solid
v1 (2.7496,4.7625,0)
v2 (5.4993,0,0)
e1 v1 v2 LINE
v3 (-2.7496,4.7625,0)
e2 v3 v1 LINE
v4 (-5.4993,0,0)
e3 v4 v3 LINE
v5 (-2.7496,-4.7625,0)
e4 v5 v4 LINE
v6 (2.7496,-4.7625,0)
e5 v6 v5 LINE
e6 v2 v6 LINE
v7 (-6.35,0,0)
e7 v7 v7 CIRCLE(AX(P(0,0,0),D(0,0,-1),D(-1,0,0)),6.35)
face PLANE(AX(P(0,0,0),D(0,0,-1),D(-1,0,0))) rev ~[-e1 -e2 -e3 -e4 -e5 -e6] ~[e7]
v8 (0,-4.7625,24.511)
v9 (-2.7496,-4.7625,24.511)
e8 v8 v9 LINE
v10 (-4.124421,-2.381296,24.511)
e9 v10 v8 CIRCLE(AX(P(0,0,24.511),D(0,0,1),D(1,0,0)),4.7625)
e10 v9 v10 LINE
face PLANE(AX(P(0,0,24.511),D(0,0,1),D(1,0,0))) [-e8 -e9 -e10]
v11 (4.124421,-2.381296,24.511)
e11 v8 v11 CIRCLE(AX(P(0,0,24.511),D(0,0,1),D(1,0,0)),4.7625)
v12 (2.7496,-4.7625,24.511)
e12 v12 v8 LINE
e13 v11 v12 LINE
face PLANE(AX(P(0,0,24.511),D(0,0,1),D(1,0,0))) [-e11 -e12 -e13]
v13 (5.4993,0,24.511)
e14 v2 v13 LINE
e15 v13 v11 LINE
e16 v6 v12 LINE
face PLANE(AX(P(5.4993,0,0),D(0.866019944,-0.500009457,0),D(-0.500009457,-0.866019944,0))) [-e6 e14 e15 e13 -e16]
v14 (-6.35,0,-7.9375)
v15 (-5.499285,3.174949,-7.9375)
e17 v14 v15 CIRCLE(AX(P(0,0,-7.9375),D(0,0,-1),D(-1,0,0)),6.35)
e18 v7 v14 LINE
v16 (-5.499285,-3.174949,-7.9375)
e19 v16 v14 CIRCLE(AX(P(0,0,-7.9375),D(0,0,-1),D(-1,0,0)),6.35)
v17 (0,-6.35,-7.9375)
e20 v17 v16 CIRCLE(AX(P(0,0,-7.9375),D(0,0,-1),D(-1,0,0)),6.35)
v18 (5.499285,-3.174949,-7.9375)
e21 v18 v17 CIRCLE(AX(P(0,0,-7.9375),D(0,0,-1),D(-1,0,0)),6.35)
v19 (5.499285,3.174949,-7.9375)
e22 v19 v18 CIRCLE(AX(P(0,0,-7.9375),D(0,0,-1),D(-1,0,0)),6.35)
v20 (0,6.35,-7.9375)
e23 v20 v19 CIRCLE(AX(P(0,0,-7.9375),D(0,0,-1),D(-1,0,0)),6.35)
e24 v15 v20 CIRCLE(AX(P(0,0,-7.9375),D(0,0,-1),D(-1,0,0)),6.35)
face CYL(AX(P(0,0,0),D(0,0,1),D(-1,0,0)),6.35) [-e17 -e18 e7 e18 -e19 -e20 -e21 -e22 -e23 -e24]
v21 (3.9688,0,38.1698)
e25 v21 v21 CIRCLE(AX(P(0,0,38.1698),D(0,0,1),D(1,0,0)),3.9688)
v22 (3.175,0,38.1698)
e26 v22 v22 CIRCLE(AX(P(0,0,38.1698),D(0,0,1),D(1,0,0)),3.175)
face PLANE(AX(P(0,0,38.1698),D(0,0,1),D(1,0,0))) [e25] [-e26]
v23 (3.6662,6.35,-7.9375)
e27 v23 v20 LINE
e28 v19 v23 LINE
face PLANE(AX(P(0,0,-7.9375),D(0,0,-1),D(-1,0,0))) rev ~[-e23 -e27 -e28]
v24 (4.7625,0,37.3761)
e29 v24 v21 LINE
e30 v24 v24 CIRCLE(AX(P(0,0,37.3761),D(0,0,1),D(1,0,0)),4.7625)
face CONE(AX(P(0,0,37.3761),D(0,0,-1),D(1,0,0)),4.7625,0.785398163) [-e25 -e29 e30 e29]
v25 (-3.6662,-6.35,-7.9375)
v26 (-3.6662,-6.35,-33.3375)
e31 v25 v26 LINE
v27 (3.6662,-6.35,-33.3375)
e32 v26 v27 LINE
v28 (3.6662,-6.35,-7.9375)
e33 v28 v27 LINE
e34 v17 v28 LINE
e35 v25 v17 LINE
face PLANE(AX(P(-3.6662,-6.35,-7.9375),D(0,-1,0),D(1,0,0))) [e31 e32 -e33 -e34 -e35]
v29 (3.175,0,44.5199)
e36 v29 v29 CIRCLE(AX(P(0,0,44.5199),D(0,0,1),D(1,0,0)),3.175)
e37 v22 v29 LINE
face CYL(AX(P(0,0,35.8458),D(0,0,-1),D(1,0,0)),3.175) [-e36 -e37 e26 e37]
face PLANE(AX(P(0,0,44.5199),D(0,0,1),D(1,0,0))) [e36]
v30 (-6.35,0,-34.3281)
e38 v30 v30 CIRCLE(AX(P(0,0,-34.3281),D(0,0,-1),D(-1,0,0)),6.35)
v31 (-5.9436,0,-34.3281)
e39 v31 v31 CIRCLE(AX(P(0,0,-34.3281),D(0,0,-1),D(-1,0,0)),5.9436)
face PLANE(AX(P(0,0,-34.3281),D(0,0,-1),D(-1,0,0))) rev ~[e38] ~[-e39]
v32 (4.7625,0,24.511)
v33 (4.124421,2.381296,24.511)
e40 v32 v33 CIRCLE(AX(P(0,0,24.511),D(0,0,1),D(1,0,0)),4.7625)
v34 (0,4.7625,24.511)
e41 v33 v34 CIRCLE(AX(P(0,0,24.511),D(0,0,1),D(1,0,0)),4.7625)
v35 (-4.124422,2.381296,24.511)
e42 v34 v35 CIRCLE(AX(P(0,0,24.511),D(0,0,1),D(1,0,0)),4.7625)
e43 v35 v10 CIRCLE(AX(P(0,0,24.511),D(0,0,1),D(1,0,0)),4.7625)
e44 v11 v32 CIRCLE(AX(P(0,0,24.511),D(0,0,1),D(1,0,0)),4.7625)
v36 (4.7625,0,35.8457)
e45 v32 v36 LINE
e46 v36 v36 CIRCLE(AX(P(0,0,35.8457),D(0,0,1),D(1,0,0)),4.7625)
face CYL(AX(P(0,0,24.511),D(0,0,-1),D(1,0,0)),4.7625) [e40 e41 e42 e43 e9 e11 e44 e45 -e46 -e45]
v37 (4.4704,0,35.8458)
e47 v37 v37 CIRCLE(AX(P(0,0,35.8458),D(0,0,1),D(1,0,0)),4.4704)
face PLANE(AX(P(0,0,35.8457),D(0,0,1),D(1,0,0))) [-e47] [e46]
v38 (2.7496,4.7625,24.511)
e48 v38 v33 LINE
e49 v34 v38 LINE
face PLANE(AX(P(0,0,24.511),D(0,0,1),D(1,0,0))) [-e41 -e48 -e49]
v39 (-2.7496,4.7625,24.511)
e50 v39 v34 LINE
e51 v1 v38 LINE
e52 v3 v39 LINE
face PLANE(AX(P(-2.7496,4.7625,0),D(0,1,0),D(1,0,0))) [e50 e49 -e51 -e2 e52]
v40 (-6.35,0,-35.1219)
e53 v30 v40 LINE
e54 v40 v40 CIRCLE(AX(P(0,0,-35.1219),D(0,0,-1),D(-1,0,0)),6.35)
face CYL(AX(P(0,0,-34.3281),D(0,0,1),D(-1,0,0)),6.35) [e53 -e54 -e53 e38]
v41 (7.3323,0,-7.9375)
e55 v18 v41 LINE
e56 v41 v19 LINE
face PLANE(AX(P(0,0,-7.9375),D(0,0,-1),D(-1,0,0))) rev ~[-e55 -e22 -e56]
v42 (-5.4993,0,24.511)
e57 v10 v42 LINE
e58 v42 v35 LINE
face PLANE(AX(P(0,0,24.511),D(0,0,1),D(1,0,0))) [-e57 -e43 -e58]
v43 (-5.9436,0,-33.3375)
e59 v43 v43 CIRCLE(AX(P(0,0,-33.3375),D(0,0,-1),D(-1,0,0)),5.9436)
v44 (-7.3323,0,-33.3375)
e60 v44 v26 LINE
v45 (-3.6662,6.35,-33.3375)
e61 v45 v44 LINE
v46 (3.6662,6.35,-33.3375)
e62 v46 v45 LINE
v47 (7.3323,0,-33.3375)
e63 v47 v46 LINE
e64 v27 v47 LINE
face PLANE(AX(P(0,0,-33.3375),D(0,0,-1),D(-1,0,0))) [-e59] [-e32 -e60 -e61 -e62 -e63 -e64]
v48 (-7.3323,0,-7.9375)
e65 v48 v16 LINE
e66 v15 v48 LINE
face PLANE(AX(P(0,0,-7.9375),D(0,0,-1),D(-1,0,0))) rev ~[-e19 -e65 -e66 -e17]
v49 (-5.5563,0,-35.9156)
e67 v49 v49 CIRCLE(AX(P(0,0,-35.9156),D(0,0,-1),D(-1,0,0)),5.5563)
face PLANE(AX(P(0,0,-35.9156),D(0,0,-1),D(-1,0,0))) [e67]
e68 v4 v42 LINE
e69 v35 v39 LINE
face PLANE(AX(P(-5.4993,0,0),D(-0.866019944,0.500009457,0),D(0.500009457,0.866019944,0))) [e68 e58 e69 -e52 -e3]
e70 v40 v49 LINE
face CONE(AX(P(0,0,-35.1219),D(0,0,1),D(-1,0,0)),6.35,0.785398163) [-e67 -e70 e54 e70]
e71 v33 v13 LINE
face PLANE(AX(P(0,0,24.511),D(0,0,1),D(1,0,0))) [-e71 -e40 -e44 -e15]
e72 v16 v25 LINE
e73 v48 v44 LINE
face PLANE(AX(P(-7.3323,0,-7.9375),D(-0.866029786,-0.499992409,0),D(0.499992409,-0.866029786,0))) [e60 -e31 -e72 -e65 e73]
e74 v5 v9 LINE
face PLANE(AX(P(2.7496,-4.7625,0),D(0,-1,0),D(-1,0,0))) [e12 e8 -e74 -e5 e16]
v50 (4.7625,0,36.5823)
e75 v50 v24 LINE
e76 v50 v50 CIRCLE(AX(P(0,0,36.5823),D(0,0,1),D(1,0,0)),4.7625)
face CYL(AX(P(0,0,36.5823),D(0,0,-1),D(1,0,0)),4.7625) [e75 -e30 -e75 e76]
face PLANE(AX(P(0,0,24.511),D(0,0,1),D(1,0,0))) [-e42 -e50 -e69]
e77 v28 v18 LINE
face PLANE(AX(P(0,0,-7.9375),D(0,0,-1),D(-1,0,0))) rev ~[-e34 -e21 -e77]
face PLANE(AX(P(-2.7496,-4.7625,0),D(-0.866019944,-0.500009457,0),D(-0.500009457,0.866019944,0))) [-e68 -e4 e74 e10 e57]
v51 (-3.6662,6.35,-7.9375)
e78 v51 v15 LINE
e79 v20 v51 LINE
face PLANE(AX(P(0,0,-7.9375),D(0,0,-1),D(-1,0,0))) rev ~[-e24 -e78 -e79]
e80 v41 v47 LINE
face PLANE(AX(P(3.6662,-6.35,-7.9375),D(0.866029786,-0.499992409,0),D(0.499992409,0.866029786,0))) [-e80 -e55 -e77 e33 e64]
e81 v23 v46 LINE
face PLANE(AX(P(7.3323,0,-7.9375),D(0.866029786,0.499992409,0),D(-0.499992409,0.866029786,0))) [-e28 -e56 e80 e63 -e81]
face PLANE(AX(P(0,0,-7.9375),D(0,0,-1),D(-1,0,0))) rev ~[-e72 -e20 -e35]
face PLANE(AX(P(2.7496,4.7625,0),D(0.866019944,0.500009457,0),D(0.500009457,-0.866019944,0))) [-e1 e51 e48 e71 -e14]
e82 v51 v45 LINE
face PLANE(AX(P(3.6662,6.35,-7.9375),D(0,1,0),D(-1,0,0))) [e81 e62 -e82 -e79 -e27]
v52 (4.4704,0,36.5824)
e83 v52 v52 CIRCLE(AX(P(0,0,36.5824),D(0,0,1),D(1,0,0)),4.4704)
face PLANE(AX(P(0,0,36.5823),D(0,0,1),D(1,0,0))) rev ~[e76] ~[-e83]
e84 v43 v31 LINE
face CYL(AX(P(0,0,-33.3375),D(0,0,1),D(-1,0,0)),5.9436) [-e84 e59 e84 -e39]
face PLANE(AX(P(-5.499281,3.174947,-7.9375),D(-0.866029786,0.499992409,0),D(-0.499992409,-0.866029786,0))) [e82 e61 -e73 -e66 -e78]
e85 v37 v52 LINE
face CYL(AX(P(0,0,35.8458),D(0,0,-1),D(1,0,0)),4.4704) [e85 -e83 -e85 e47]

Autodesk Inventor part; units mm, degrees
ref_plane "YZ Plane" through (0, 0, 0) normal (1, 0, 0) x (0, 1, 0)
ref_plane "XZ Plane" through (0, 0, 0) normal (0, 1, 0) x (-1, 0, 0)
ref_plane "XY Plane" through (0, 0, 0) normal (0, 0, 1) x (1, 0, 0)
sketch "Sketch1" plane through (0, 0, 0) normal (0, 0, 1) x (1, 0, 0)
  line L0 (-5.4993, 0) -> (-2.7496, 4.7625)
  line L1 (-2.7496, 4.7625) -> (2.7496, 4.7625)
  line L2 (2.7496, 4.7625) -> (5.4993, 0)
  line L3 (5.4993, 0) -> (2.7496, -4.7625)
  line L4 (2.7496, -4.7625) -> (-2.7496, -4.7625)
  line L5 (-2.7496, -4.7625) -> (-5.4993, 0)
  point P0 (0, 0)
  point P1 (0, 0)
  dimension "d58" = 1.5875
  dimension "d59" = 0
  dimension "d0" = 9.525
extrude "3/8 Hex" add sketch "Sketch1" along normal blind 24.511
sketch "Sketch2" plane through (0, 0, 24.511) normal (0, 0, 1) x (1, 0, 0)
  circle A0 centre (0, 0) radius 4.7625
  dimension "d3" = 9.525
extrude "3/8 Round" add sketch "Sketch2" along normal blind 11.3347
sketch "Sketch3" plane through (0, 0, 35.8458) normal (0, 0, 1) x (1, 0, 0)
  circle A0 centre (0, 0) radius 4.7625 projected
  circle A1 centre (0, 0) radius 3.175
  dimension "d6" = 6.35
extrude "1/4 Round" add sketch "Sketch3" along normal blind 8.6741 contours A1
sketch "Sketch7" plane through (0, 0, 0) normal (0, 0, -1) x (-1, 0, 0)
  circle A0 centre (0, 0) radius 6.35
  dimension "d18" = 12.7
extrude "1/2 Round" add sketch "Sketch7" along normal blind 7.9375
sketch "Sketch8" plane through (0, 0, -7.9375) normal (0, 0, -1) x (-1, 0, 0)
  circle A0 centre (0, 0) radius 6.35 projected
  line L0 (-7.3323, 0) -> (-3.6662, 6.35)
  line L1 (-3.6662, 6.35) -> (3.6662, 6.35)
  line L2 (3.6662, 6.35) -> (7.3323, 0)
  line L3 (7.3323, 0) -> (3.6662, -6.35)
  line L4 (3.6662, -6.35) -> (-3.6662, -6.35)
  line L5 (-3.6662, -6.35) -> (-7.3323, 0)
  dimension "d21" = 12.7
extrude "1/2 Hex" add sketch "Sketch8" along normal blind 25.4
sketch "Sketch12" plane through (0, 0, -33.3375) normal (0, 0, -1) x (-1, 0, 0)
  circle A0 centre (0, 0) radius 5.9436
  dimension "d41" = 11.8872
extrude "Spring Clip Groove" add sketch "Sketch12" along normal blind 0.9906
sketch "Sketch13" plane through (0, 0, -34.3281) normal (0, 0, -1) x (-1, 0, 0)
  circle A0 centre (0, 0) radius 5.9436 projected
  circle A1 centre (0, 0) radius 6.35
  dimension "d45" = 12.7
extrude "Spring Clip" add sketch "Sketch13" along normal blind 1.5875 contours A0 | A1
chamfer "Chamfer2" distance 0.7937 angle 45 1 edges at (6.35, 0, -35.9156)
sketch "Sketch14" plane through (0, 0, 35.8458) normal (0, 0, 1) x (1, 0, 0)
  circle A0 centre (0, 0) radius 3.175 projected
  circle A1 centre (0, 0) radius 4.7625 projected
  circle A2 centre (0, 0) radius 4.4704
  dimension "d52" = 8.9408
extrude "3/8 Spring Clip Groove" add sketch "Sketch14" along normal blind 0.7366 contours A2
sketch "Sketch15" plane through (0, 0, 36.5823) normal (0, 0, 1) x (1, 0, 0)
  circle A0 centre (0, 0) radius 3.175 projected
  circle A1 centre (0, 0) radius 4.4704 projected
  circle A2 centre (0, 0) radius 4.7625
  dimension "d56" = 9.525
extrude "3/8 Round 2" add sketch "Sketch15" along normal blind 1.5875 contours A1 | A2
chamfer "Chamfer3" distance 0.7937 angle 45 1 edges at (-4.7625, 0, 38.1698)
properties part number "Primary Shaft"
